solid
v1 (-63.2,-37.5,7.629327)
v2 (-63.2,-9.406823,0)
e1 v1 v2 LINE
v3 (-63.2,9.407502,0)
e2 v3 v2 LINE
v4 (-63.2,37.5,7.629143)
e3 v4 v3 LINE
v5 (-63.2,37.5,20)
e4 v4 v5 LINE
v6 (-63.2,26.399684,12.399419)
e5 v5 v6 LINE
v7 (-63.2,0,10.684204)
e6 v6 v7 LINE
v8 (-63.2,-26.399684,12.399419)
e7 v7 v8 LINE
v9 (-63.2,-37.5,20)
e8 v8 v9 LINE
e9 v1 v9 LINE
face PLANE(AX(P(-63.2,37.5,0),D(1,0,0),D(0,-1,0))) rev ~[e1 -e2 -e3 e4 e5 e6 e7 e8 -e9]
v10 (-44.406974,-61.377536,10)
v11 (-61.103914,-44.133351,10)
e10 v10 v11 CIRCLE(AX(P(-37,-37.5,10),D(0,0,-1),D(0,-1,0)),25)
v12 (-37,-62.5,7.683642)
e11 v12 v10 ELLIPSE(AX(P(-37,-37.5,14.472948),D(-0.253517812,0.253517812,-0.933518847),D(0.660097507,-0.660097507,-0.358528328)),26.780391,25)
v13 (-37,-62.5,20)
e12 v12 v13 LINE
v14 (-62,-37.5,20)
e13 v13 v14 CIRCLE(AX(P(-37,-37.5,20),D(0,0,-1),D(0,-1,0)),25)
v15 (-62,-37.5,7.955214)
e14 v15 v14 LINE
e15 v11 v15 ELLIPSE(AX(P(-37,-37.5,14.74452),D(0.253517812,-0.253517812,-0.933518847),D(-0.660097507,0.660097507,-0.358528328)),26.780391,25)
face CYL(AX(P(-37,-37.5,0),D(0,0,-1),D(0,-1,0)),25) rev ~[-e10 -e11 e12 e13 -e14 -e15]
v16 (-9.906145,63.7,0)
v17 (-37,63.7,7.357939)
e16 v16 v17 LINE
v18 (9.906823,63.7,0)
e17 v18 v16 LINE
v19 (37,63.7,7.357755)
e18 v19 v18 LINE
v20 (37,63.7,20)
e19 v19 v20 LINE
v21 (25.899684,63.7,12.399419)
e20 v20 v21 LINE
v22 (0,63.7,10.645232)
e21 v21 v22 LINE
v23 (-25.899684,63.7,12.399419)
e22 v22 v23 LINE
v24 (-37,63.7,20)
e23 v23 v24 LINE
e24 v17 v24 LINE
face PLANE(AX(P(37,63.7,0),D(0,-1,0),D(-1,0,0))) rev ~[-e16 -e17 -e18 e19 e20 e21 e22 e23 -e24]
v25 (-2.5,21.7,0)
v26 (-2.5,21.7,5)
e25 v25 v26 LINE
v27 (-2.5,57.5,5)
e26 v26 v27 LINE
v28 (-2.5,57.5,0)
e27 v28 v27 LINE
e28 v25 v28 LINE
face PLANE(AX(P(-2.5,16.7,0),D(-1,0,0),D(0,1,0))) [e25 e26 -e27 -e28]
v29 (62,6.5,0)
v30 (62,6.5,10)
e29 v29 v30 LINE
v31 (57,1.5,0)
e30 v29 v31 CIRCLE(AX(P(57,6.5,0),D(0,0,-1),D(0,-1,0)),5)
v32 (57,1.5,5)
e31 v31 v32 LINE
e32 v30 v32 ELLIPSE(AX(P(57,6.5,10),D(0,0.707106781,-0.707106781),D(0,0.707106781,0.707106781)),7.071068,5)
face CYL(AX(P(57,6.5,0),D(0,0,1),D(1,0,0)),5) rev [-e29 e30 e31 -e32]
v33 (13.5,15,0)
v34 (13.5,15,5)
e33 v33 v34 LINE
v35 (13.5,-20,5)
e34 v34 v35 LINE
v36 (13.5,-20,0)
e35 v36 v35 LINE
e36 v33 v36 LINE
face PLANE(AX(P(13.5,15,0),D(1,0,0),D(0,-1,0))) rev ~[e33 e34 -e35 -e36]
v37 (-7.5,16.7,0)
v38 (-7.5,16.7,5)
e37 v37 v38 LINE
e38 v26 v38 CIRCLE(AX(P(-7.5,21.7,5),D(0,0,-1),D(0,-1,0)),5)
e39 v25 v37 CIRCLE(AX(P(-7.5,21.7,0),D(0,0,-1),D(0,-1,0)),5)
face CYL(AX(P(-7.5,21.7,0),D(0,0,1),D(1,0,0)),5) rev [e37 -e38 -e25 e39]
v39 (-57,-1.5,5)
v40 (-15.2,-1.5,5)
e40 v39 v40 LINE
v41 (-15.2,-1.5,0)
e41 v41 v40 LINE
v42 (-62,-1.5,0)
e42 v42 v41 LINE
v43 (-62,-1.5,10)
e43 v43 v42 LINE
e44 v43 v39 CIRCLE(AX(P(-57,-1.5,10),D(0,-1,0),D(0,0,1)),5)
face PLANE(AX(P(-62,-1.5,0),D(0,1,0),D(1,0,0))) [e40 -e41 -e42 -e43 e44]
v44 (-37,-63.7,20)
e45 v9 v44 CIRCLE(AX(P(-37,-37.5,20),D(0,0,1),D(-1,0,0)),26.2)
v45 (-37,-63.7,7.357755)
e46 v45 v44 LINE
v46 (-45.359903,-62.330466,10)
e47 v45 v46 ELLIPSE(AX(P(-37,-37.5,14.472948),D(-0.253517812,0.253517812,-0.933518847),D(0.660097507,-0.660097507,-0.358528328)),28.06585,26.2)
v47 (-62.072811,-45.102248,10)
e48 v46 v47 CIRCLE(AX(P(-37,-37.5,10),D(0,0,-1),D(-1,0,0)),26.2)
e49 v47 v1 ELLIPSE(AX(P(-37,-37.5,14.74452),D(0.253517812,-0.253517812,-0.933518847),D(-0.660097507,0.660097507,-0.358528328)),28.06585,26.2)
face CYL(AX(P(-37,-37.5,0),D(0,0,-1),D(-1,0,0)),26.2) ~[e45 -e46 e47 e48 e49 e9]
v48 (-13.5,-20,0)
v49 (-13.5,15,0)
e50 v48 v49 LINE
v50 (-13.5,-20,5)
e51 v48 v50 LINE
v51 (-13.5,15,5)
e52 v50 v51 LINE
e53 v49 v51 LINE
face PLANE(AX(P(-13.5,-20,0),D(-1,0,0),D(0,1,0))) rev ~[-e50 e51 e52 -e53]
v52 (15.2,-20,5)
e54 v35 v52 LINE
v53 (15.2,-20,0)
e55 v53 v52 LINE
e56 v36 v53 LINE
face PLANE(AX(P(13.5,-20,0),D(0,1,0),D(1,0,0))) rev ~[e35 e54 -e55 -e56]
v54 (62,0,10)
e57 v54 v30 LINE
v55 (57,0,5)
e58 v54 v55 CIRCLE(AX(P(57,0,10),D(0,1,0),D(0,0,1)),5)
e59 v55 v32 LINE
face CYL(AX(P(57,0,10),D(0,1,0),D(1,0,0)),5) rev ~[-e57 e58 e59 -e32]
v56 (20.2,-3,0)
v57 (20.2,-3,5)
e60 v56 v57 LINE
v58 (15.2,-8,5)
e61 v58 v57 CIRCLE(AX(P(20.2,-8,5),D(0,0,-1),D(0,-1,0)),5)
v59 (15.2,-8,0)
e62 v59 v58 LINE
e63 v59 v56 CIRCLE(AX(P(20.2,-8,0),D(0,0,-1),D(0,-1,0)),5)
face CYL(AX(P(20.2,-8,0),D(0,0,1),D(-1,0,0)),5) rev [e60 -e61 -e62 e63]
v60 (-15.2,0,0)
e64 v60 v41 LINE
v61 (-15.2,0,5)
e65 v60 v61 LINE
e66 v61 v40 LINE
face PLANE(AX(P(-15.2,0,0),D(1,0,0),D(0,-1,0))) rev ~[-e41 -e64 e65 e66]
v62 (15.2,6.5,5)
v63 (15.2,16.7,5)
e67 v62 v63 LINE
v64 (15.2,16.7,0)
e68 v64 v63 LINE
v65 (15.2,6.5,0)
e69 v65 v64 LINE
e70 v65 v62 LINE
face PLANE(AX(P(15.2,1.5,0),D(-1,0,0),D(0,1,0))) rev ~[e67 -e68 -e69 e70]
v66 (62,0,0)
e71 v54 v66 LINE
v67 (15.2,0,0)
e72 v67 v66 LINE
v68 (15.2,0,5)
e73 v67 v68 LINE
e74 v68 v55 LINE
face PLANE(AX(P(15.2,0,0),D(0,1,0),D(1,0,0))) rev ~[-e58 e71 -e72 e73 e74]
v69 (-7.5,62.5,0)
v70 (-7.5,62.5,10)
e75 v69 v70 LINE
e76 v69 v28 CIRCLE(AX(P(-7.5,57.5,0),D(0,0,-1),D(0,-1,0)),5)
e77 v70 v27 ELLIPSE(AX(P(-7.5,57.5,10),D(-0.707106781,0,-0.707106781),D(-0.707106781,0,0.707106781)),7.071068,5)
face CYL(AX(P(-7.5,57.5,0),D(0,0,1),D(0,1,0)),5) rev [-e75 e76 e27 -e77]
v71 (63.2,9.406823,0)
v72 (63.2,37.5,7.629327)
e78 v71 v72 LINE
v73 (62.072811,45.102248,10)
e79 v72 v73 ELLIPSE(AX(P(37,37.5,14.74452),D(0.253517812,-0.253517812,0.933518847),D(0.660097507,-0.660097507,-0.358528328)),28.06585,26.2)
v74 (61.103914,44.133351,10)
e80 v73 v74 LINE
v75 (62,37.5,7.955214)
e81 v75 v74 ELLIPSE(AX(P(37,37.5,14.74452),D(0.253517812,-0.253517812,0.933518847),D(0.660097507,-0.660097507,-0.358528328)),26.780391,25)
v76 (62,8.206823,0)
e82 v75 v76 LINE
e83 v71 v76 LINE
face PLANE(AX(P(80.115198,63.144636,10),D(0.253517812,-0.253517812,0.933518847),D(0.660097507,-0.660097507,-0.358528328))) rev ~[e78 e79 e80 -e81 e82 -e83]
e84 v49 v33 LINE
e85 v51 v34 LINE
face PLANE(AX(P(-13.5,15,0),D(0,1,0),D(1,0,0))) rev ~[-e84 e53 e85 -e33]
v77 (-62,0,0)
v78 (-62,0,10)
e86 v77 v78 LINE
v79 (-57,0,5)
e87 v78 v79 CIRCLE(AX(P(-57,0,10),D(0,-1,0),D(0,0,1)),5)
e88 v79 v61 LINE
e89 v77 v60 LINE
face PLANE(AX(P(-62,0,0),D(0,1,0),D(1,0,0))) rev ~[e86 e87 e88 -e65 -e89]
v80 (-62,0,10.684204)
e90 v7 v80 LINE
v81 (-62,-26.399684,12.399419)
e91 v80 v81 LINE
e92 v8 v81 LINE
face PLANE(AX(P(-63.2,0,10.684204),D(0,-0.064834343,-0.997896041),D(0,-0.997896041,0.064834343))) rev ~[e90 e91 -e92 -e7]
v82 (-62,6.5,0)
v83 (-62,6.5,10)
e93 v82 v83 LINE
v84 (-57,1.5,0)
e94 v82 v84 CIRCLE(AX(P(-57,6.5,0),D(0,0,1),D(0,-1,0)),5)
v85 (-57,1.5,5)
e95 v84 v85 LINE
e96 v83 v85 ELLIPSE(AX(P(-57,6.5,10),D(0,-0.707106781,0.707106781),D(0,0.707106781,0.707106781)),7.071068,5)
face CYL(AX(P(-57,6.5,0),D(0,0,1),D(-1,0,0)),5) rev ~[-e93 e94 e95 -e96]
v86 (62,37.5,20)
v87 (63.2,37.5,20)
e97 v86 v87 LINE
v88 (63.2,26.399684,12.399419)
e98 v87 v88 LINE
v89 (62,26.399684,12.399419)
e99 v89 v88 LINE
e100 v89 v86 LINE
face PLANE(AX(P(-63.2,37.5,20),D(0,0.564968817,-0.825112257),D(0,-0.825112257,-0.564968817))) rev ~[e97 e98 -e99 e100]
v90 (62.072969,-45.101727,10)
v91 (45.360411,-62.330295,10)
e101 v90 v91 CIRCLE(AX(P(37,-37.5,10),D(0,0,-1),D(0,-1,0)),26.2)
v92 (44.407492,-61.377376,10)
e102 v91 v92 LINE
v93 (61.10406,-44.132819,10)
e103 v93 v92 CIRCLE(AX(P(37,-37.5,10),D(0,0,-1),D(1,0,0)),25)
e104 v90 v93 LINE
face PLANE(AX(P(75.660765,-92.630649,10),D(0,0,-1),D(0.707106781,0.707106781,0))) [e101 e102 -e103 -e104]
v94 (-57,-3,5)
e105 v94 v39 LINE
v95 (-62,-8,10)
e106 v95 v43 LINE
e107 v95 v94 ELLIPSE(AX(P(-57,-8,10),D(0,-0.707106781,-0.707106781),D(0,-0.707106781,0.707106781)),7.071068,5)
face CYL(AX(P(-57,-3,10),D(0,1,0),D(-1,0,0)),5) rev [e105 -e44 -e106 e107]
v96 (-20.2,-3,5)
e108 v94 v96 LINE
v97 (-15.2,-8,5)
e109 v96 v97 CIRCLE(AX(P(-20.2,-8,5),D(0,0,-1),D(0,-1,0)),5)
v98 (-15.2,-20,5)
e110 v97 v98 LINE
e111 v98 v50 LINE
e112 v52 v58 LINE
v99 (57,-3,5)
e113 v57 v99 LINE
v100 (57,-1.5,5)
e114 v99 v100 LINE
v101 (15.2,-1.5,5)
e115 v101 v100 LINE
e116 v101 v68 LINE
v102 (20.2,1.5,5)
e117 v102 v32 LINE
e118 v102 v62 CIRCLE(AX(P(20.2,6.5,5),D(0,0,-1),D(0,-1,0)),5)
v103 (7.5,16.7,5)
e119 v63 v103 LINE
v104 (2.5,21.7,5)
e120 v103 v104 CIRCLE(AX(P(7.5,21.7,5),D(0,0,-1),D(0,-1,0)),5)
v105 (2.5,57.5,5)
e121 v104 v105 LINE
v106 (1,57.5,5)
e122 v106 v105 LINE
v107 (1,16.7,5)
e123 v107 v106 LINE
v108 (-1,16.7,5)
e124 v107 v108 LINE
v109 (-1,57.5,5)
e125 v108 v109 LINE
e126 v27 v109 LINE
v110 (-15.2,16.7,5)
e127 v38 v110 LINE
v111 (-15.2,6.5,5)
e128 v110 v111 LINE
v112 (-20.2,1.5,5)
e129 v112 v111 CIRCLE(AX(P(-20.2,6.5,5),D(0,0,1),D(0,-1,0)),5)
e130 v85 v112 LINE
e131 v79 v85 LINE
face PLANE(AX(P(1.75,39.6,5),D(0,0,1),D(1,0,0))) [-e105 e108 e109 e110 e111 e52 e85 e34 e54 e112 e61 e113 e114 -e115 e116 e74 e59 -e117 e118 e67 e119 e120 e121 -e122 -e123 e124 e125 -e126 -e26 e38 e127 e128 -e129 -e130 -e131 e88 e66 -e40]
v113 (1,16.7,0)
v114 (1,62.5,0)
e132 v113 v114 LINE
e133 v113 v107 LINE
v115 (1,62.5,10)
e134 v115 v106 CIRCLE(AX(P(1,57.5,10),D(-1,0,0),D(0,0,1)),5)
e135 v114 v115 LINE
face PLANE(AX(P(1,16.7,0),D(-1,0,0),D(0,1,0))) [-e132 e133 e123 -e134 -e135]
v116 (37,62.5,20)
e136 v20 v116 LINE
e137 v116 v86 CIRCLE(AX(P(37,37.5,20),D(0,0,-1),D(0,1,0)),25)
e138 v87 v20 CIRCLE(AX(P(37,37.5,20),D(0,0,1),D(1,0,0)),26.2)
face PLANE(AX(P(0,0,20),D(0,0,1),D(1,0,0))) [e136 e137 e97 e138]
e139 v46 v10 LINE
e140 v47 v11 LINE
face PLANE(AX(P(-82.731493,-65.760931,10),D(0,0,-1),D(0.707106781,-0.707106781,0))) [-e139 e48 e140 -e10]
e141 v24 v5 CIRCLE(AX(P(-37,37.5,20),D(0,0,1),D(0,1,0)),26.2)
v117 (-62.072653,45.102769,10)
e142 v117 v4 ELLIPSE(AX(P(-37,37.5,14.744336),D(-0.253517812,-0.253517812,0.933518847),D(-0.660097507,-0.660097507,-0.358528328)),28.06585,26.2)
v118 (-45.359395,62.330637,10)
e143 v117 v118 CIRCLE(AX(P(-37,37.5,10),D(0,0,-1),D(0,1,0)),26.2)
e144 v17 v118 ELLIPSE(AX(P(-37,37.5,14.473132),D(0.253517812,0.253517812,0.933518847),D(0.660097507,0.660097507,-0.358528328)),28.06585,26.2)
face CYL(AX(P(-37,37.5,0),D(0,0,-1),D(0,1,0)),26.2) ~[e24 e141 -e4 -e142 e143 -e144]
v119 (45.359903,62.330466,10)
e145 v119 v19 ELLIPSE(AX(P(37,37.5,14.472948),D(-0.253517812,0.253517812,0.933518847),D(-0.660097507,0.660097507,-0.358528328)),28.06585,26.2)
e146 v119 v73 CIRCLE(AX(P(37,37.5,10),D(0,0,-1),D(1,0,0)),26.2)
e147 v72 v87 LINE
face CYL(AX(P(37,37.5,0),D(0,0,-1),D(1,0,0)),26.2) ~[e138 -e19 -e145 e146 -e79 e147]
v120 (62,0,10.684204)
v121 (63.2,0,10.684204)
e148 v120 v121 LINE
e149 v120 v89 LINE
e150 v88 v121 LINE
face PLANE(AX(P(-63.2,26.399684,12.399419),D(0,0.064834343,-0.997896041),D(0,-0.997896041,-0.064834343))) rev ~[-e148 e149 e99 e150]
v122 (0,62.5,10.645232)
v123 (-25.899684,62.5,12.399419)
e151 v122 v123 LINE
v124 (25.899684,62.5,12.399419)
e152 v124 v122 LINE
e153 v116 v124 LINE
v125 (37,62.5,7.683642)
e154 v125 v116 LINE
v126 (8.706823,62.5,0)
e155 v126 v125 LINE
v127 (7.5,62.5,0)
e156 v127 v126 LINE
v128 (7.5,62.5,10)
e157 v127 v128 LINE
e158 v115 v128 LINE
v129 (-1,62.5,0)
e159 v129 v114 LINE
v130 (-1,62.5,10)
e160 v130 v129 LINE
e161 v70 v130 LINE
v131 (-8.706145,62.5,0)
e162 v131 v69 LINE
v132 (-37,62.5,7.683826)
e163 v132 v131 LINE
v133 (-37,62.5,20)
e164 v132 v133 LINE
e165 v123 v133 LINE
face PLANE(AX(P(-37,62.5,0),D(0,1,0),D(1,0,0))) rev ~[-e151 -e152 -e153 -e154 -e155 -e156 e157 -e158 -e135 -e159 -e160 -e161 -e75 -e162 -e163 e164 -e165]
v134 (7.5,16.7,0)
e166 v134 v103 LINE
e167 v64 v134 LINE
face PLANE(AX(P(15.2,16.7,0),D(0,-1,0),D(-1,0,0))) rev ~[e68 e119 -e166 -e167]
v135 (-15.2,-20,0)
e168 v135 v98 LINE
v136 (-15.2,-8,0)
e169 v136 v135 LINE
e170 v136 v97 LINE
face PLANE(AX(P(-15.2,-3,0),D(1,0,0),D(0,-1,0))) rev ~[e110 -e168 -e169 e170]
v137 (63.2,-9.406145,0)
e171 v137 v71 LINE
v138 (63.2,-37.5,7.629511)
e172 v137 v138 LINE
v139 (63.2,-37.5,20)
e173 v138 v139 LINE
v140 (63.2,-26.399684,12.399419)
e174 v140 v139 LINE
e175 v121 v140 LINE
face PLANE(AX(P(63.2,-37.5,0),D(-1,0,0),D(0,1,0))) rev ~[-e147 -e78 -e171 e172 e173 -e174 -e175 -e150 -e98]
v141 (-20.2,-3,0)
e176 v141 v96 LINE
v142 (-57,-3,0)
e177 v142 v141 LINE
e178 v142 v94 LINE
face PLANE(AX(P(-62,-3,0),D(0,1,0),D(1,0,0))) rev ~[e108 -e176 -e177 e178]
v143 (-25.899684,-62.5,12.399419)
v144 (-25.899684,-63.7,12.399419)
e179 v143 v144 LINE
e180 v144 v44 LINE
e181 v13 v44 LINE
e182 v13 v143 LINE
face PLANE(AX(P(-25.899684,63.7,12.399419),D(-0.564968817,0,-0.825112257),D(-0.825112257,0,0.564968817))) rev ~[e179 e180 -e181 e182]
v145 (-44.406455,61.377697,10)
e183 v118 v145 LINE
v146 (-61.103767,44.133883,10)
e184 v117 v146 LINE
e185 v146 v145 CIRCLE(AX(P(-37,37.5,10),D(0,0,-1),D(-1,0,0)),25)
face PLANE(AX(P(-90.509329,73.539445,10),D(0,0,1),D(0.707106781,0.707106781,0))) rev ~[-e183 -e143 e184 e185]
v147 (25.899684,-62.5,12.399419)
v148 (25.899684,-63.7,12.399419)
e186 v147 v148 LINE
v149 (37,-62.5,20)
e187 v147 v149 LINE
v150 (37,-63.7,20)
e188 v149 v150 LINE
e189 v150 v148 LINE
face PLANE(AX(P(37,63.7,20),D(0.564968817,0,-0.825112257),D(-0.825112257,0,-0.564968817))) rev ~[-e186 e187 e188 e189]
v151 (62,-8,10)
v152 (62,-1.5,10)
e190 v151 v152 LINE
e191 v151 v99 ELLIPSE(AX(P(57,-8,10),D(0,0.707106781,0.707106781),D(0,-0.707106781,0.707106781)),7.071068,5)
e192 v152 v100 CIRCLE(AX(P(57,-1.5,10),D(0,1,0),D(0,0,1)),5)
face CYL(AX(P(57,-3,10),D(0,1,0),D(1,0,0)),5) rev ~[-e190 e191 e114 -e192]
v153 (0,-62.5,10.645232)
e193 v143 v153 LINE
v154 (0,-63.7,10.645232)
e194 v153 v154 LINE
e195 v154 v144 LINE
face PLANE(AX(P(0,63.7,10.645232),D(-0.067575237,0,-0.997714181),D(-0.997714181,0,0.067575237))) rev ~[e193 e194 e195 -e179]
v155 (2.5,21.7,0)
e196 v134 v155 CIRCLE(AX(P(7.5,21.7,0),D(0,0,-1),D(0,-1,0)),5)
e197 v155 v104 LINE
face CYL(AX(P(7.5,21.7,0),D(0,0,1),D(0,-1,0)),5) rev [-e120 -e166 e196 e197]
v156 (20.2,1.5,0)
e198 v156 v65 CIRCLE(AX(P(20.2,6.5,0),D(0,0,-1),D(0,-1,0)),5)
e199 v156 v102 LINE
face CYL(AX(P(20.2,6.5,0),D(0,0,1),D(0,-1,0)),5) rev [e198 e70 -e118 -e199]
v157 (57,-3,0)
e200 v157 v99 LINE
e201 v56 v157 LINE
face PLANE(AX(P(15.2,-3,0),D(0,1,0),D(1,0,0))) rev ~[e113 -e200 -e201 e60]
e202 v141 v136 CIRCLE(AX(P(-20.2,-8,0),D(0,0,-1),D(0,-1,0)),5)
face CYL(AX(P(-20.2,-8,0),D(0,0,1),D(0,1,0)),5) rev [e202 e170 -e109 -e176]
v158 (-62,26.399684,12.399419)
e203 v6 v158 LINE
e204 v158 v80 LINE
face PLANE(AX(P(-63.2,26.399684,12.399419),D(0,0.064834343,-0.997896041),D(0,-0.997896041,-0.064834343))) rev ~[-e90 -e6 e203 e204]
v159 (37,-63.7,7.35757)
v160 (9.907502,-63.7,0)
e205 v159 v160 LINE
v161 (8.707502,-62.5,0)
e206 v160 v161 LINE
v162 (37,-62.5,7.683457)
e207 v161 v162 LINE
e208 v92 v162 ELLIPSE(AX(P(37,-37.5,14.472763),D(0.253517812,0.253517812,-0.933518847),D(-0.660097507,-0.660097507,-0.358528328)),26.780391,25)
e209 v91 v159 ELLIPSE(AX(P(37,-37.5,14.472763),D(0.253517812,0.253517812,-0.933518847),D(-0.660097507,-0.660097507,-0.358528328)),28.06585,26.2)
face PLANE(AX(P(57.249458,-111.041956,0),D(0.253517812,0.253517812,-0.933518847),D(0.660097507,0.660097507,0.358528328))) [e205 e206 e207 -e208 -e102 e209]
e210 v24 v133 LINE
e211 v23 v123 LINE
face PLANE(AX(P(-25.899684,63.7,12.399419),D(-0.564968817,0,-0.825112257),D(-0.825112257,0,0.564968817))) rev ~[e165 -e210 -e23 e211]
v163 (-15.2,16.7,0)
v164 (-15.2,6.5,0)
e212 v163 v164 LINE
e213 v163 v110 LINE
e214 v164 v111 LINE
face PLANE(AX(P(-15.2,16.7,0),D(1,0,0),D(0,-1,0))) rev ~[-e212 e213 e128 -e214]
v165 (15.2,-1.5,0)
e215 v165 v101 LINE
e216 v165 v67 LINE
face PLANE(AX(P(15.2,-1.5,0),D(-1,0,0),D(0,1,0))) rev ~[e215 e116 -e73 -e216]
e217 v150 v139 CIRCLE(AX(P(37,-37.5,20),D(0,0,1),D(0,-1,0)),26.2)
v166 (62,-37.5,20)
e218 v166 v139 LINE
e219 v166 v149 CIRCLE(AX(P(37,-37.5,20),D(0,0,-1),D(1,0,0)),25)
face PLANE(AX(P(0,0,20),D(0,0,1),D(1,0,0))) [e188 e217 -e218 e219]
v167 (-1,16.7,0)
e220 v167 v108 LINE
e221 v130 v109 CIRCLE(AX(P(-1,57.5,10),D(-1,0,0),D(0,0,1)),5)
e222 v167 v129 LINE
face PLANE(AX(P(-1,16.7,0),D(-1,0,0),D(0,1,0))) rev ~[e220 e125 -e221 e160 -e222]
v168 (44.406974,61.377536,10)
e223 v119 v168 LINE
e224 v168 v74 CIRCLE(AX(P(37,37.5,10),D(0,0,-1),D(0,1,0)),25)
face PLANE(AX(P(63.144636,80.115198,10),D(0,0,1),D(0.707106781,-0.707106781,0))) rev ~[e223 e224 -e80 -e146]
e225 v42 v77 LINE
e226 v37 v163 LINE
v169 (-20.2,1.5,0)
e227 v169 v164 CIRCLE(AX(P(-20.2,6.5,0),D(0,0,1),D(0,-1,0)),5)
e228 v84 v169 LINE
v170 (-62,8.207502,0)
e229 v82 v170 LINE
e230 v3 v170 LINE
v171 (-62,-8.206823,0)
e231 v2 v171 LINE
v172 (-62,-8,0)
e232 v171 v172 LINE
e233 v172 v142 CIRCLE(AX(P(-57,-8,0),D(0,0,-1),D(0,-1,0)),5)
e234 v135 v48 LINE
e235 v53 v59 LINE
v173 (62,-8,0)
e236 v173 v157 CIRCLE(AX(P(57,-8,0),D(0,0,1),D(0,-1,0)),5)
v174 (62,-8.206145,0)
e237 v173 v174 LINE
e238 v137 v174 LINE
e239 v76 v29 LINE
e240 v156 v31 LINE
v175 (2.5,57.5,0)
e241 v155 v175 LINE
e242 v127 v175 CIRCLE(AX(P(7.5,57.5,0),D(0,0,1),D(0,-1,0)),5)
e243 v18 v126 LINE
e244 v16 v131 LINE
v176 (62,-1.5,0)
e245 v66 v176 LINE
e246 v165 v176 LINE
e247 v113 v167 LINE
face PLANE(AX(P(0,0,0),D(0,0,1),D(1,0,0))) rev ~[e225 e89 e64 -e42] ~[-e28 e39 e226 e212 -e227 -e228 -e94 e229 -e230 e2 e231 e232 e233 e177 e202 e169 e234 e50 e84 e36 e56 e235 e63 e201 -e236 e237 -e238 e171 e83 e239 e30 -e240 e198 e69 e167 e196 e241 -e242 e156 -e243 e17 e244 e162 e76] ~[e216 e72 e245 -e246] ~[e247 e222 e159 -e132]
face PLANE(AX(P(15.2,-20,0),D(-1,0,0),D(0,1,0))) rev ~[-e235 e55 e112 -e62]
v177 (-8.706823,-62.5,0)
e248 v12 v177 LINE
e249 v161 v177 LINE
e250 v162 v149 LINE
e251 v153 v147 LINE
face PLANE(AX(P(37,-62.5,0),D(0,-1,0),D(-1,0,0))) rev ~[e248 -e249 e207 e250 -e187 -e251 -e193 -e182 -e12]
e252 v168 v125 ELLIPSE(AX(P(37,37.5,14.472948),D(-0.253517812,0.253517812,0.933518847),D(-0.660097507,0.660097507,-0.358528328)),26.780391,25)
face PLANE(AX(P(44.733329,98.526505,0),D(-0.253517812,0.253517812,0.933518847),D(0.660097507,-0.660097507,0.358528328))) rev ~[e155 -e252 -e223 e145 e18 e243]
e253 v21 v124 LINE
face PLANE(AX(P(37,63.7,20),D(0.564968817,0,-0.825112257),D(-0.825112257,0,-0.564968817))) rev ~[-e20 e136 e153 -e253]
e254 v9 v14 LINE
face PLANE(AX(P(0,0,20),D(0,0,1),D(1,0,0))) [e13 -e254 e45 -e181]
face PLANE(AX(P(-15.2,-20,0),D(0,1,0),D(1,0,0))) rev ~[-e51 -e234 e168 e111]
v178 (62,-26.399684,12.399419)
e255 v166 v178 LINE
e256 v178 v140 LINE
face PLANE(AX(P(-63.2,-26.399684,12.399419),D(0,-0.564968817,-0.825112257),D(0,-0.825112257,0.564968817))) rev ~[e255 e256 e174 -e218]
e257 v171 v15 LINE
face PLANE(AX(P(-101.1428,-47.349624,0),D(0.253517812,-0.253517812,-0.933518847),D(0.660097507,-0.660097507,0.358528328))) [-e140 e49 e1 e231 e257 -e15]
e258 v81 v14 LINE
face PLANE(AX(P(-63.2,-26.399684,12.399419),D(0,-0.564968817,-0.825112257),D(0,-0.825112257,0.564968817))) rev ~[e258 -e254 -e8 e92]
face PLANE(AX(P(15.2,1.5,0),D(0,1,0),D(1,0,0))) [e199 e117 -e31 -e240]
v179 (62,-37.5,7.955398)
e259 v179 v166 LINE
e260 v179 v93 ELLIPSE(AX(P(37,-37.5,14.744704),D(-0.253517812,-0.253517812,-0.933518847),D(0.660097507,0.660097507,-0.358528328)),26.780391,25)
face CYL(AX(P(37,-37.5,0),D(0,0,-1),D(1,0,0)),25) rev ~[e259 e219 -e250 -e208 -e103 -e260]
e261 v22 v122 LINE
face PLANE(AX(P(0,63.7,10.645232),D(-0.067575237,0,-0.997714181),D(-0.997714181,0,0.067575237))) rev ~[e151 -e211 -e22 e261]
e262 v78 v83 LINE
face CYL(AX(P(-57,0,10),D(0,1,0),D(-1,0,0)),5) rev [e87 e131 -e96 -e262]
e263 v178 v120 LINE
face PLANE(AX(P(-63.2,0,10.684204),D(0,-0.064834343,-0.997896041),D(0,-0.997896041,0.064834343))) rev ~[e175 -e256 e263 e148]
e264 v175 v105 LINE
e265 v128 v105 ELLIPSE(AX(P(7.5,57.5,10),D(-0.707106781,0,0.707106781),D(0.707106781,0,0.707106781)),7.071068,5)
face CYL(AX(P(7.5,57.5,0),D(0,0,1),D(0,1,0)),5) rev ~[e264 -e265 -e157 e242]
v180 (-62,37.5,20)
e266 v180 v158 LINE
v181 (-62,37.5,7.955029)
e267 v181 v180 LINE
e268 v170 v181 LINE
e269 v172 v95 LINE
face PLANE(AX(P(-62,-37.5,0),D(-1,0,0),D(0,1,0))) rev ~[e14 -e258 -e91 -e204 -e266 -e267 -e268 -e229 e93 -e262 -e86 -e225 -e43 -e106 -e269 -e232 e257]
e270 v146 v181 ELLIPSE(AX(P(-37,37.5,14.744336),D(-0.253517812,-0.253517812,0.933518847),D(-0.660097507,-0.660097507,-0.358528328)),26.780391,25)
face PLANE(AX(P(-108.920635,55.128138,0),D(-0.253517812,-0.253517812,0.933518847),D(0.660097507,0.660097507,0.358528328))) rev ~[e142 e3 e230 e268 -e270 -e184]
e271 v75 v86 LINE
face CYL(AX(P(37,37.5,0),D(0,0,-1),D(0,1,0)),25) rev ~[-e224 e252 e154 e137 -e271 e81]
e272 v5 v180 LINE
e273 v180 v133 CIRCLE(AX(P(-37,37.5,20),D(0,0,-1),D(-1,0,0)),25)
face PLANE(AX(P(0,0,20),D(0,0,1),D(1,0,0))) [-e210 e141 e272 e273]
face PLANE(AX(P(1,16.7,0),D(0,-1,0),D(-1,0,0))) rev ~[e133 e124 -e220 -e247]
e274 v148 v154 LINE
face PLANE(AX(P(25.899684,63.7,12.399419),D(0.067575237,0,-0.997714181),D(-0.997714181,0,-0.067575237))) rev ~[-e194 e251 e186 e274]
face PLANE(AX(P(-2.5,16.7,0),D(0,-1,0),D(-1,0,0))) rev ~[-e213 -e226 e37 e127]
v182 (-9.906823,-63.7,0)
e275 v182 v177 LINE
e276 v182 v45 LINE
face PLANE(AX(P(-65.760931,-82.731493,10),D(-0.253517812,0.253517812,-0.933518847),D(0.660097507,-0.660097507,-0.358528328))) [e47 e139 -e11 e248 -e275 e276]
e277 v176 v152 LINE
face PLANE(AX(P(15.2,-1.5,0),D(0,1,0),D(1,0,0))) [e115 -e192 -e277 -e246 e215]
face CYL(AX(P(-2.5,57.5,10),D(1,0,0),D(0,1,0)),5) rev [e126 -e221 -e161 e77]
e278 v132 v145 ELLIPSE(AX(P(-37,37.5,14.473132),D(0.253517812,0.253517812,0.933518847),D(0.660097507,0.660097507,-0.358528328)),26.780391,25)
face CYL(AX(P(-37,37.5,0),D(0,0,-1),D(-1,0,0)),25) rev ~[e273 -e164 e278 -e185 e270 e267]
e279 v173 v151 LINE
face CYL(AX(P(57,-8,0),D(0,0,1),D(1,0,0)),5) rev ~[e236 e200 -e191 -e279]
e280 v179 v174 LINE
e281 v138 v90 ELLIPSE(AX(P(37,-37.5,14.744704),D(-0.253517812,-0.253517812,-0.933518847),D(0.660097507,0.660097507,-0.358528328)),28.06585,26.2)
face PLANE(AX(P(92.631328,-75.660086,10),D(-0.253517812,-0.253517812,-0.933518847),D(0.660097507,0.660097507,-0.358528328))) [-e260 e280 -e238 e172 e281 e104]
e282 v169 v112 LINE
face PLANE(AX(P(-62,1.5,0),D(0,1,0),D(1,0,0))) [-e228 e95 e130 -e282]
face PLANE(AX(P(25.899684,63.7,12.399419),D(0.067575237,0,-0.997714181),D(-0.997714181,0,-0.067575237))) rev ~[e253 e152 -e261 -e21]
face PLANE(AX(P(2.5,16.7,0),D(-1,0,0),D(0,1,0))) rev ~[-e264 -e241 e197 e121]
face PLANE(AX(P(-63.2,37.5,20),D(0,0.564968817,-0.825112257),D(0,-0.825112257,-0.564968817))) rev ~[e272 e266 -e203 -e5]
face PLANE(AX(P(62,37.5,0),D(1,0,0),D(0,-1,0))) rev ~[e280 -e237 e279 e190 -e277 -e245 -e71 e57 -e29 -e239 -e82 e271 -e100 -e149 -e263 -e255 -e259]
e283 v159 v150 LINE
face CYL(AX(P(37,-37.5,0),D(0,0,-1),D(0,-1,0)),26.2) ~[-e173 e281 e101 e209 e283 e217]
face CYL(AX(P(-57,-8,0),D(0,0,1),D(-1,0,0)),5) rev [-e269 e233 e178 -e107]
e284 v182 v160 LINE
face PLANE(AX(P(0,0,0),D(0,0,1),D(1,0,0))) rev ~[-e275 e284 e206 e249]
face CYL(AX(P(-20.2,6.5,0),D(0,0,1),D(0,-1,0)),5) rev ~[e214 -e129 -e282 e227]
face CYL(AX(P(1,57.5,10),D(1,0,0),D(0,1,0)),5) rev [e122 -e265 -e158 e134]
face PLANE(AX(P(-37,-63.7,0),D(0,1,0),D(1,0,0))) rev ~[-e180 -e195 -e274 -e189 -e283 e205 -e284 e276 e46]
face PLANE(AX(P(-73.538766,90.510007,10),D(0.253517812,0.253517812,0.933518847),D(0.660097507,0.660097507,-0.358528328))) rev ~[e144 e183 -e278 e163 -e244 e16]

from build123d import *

# Parameters (mm, degrees)
F1_DEPTH  = 20
F0_W      = 1.5
F0_H      = 45.8000004292
F0_W_2    = 46.8000004292
F0_H_2    = 1.5
F2_DEPTH  = 5
F3_R      = 5
F5_DEPTH  = 150.7
F7_DEPTH  = 137.6
F13_DEPTH = 60
F14_DEPTH = 56.1
F20_DEPTH = 72.8
F21_DEPTH = 71.7


with BuildPart() as f1:
    # F0 (on Top) → F1 (new body)
    with BuildSketch(Plane.XY):
        with BuildLine():
            Line((37, 63.7), (-37, 63.7))
            ThreePointArc((-37, 63.7), (-55.5261976671, 56.0261976671), (-63.2, 37.5))
            Line((-63.2, 37.5), (-63.2, -37.5))
            ThreePointArc((-63.2, -37.5), (-55.5261976671, -56.0261976671), (-37, -63.7))
            Line((-37, -63.7), (37, -63.7))
            ThreePointArc((37, -63.7), (55.5261976671, -56.0261976671), (63.2, -37.5))
            Line((63.2, -37.5), (63.2, 37.5))
            ThreePointArc((63.2, 37.5), (55.5261976671, 56.0261976671), (37, 63.7))
        make_face()
        with BuildLine():
            ThreePointArc((-62, 37.5), (-54.6776695297, 55.1776695297), (-37, 62.5))
            Line((-37, 62.5), (-2.5, 62.5))
            Line((-2.5, 62.5), (-1, 62.5))
            Line((-1, 62.5), (1, 62.5))
            Line((1, 62.5), (2.5, 62.5))
            Line((2.5, 62.5), (37, 62.5))
            ThreePointArc((37, 62.5), (54.6776695297, 55.1776695297), (62, 37.5))
            Line((62, 37.5), (62, 1.5))
            Line((62, 1.5), (62, 0))
            Line((62, 0), (62, -1.5))
            Line((62, -1.5), (62, -3))
            Line((62, -3), (62, -37.5))
            ThreePointArc((62, -37.5), (54.6776695297, -55.1776695297), (37, -62.5))
            Line((37, -62.5), (-37, -62.5))
            ThreePointArc((-37, -62.5), (-54.6776695297, -55.1776695297), (-62, -37.5))
            Line((-62, -37.5), (-62, -3))
            Line((-62, -3), (-62, -1.5))
            Line((-62, -1.5), (-62, 0))
            Line((-62, 0), (-62, 1.5))
            Line((-62, 1.5), (-62, 37.5))
        make_face(mode=Mode.SUBTRACT)
    extrude(amount=F1_DEPTH)

    # F0 (on Top) → F2 (join)
    with BuildSketch(Plane.XY):
        with Locations((1.75, 39.5999997854)):
            Rectangle(F0_W, F0_H)
        Polygon((-1, 16.6999995708), (-2.5, 16.6999995708), (-15.1999995708, 16.6999995708), (-15.1999995708, 1.5), (-15.1999995708, 0), (-15.1999995708, -1.5), (-15.1999995708, -3), (-15.1999995708, -16.6999995708), (-15.1999995708, -20), (-13.5, -20), (-13.5, -15), (-13.5, 15), (13.5, 15), (13.5, -15), (13.5, -20), (15.1999995708, -20), (15.1999995708, -15), (15.1999995708, -3), (15.1999995708, -1.5), (15.1999995708, 0), (15.1999995708, 1.5), (15.1999995708, 16.6999995708), (2.5, 16.6999995708), (1, 16.6999995708), align=None)
        with Locations((-1.75, 39.5999997854)):
            Rectangle(F0_W, F0_H)
        with Locations((-38.5999997854, 0.75)):
            Rectangle(F0_W_2, F0_H_2)
        with Locations((-38.5999997854, -2.25)):
            Rectangle(F0_W_2, F0_H_2)
        with Locations((38.5999997854, 0.75)):
            Rectangle(F0_W_2, F0_H_2)
        with Locations((38.5999997854, -2.25)):
            Rectangle(F0_W_2, F0_H_2)
    extrude(amount=F2_DEPTH)

    # F3
    f3_edges = [f1.edges().sort_by_distance(p)[0] for p in [
        (-2.5, 62.5, 2.5),
        (2.5, 62.5, 2.5),
        (-2.5, 16.7, 2.5),
        (2.5, 16.7, 2.5),
        (62, 1.5, 2.5),
        (15.2, 1.5, 2.5),
        (62, -3, 2.5),
        (15.2, -3, 2.5),
        (-15.2, -3, 2.5),
        (-62, -3, 2.5),
        (-62, 1.5, 2.5),
        (-15.2, 1.5, 2.5),
        (1.75, 62.5, 5),
        (-1.75, 62.5, 5),
        (62, 0.75, 5),
        (62, -2.25, 5),
        (-62, 0.75, 5),
        (-62, -2.25, 5),
    ]]
    fillet(f3_edges, radius=F3_R)

    # F4 (on face) → F5 (cut)
    with BuildSketch(Plane(origin=(0, 63.7, 0), x_dir=(-1, 0, 0), z_dir=(0, 1, 0))):
        Polygon((37, 20), (-37, 20), (-25.8996840566, 12.3994192109), (0, 10.6452321634), (25.8996840566, 12.3994192109), align=None)
    extrude(amount=-F5_DEPTH, mode=Mode.SUBTRACT)

    # F6 (on face) → F7 (cut)
    with BuildSketch(Plane(origin=(-63.2, 0, 0), x_dir=(0, -1, 0), z_dir=(-1, 0, 0))):
        Polygon((37.5, 20), (-37.5, 20), (-26.3996840566, 12.3994192109), (0, 10.6842042878), (26.3996840566, 12.3994192109), align=None)
    extrude(amount=-F7_DEPTH, mode=Mode.SUBTRACT)

    # F12 (on face) → F13 (cut)
    with BuildSketch(Plane(origin=(-74.2462120246, -74.2462120246, 0), x_dir=(-0.7071067812, 0.7071067812, 0), z_dir=(0.7071067812, 0.7071067812, 0))):
        Polygon((-12, 10), (-38.037519902, 0), (38.037519902, 0), (12, 10), (0, 10), align=None)
    extrude(amount=F13_DEPTH, mode=Mode.SUBTRACT)

    # F10 (on face) → F14 (cut)
    with BuildSketch(Plane(origin=(71.6299169342, 71.6299169342, 0), x_dir=(-0.7071067812, 0.7071067812, 0), z_dir=(0.7071067812, 0.7071067812, 0))):
        Polygon((-38.037519902, 0), (0, 0), (0, 10), (-12, 10), align=None)
        Polygon((0, 10), (0, 0), (38.037519902, 0), (12, 10), align=None)
    extrude(amount=-F14_DEPTH, mode=Mode.SUBTRACT)

    # F19 (on face) → F20 (cut)
    with BuildSketch(Plane(origin=(84.1457069612, -84.1457069612, 0), x_dir=(-0.7071067812, -0.7071067812, 0), z_dir=(-0.7071067812, 0.7071067812, 0))):
        Polygon((-12.000480098, 10), (-38.038, 0), (38.037039804, 0), (11.999519902, 10), (-0.000480098, 10), align=None)
    extrude(amount=F20_DEPTH, mode=Mode.SUBTRACT)

    # F18 (on face) → F21 (cut)
    with BuildSketch(Plane(origin=(-82.0243866176, 82.0243866176, 0), x_dir=(-0.7071067812, -0.7071067812, 0), z_dir=(-0.7071067812, 0.7071067812, 0))):
        Polygon((-12.000480098, 10), (-38.038, 0), (38.037039804, 0), (11.999519902, 10), (-0.000480098, 10), align=None)
    extrude(amount=-F21_DEPTH, mode=Mode.SUBTRACT)


solid = f1.part
